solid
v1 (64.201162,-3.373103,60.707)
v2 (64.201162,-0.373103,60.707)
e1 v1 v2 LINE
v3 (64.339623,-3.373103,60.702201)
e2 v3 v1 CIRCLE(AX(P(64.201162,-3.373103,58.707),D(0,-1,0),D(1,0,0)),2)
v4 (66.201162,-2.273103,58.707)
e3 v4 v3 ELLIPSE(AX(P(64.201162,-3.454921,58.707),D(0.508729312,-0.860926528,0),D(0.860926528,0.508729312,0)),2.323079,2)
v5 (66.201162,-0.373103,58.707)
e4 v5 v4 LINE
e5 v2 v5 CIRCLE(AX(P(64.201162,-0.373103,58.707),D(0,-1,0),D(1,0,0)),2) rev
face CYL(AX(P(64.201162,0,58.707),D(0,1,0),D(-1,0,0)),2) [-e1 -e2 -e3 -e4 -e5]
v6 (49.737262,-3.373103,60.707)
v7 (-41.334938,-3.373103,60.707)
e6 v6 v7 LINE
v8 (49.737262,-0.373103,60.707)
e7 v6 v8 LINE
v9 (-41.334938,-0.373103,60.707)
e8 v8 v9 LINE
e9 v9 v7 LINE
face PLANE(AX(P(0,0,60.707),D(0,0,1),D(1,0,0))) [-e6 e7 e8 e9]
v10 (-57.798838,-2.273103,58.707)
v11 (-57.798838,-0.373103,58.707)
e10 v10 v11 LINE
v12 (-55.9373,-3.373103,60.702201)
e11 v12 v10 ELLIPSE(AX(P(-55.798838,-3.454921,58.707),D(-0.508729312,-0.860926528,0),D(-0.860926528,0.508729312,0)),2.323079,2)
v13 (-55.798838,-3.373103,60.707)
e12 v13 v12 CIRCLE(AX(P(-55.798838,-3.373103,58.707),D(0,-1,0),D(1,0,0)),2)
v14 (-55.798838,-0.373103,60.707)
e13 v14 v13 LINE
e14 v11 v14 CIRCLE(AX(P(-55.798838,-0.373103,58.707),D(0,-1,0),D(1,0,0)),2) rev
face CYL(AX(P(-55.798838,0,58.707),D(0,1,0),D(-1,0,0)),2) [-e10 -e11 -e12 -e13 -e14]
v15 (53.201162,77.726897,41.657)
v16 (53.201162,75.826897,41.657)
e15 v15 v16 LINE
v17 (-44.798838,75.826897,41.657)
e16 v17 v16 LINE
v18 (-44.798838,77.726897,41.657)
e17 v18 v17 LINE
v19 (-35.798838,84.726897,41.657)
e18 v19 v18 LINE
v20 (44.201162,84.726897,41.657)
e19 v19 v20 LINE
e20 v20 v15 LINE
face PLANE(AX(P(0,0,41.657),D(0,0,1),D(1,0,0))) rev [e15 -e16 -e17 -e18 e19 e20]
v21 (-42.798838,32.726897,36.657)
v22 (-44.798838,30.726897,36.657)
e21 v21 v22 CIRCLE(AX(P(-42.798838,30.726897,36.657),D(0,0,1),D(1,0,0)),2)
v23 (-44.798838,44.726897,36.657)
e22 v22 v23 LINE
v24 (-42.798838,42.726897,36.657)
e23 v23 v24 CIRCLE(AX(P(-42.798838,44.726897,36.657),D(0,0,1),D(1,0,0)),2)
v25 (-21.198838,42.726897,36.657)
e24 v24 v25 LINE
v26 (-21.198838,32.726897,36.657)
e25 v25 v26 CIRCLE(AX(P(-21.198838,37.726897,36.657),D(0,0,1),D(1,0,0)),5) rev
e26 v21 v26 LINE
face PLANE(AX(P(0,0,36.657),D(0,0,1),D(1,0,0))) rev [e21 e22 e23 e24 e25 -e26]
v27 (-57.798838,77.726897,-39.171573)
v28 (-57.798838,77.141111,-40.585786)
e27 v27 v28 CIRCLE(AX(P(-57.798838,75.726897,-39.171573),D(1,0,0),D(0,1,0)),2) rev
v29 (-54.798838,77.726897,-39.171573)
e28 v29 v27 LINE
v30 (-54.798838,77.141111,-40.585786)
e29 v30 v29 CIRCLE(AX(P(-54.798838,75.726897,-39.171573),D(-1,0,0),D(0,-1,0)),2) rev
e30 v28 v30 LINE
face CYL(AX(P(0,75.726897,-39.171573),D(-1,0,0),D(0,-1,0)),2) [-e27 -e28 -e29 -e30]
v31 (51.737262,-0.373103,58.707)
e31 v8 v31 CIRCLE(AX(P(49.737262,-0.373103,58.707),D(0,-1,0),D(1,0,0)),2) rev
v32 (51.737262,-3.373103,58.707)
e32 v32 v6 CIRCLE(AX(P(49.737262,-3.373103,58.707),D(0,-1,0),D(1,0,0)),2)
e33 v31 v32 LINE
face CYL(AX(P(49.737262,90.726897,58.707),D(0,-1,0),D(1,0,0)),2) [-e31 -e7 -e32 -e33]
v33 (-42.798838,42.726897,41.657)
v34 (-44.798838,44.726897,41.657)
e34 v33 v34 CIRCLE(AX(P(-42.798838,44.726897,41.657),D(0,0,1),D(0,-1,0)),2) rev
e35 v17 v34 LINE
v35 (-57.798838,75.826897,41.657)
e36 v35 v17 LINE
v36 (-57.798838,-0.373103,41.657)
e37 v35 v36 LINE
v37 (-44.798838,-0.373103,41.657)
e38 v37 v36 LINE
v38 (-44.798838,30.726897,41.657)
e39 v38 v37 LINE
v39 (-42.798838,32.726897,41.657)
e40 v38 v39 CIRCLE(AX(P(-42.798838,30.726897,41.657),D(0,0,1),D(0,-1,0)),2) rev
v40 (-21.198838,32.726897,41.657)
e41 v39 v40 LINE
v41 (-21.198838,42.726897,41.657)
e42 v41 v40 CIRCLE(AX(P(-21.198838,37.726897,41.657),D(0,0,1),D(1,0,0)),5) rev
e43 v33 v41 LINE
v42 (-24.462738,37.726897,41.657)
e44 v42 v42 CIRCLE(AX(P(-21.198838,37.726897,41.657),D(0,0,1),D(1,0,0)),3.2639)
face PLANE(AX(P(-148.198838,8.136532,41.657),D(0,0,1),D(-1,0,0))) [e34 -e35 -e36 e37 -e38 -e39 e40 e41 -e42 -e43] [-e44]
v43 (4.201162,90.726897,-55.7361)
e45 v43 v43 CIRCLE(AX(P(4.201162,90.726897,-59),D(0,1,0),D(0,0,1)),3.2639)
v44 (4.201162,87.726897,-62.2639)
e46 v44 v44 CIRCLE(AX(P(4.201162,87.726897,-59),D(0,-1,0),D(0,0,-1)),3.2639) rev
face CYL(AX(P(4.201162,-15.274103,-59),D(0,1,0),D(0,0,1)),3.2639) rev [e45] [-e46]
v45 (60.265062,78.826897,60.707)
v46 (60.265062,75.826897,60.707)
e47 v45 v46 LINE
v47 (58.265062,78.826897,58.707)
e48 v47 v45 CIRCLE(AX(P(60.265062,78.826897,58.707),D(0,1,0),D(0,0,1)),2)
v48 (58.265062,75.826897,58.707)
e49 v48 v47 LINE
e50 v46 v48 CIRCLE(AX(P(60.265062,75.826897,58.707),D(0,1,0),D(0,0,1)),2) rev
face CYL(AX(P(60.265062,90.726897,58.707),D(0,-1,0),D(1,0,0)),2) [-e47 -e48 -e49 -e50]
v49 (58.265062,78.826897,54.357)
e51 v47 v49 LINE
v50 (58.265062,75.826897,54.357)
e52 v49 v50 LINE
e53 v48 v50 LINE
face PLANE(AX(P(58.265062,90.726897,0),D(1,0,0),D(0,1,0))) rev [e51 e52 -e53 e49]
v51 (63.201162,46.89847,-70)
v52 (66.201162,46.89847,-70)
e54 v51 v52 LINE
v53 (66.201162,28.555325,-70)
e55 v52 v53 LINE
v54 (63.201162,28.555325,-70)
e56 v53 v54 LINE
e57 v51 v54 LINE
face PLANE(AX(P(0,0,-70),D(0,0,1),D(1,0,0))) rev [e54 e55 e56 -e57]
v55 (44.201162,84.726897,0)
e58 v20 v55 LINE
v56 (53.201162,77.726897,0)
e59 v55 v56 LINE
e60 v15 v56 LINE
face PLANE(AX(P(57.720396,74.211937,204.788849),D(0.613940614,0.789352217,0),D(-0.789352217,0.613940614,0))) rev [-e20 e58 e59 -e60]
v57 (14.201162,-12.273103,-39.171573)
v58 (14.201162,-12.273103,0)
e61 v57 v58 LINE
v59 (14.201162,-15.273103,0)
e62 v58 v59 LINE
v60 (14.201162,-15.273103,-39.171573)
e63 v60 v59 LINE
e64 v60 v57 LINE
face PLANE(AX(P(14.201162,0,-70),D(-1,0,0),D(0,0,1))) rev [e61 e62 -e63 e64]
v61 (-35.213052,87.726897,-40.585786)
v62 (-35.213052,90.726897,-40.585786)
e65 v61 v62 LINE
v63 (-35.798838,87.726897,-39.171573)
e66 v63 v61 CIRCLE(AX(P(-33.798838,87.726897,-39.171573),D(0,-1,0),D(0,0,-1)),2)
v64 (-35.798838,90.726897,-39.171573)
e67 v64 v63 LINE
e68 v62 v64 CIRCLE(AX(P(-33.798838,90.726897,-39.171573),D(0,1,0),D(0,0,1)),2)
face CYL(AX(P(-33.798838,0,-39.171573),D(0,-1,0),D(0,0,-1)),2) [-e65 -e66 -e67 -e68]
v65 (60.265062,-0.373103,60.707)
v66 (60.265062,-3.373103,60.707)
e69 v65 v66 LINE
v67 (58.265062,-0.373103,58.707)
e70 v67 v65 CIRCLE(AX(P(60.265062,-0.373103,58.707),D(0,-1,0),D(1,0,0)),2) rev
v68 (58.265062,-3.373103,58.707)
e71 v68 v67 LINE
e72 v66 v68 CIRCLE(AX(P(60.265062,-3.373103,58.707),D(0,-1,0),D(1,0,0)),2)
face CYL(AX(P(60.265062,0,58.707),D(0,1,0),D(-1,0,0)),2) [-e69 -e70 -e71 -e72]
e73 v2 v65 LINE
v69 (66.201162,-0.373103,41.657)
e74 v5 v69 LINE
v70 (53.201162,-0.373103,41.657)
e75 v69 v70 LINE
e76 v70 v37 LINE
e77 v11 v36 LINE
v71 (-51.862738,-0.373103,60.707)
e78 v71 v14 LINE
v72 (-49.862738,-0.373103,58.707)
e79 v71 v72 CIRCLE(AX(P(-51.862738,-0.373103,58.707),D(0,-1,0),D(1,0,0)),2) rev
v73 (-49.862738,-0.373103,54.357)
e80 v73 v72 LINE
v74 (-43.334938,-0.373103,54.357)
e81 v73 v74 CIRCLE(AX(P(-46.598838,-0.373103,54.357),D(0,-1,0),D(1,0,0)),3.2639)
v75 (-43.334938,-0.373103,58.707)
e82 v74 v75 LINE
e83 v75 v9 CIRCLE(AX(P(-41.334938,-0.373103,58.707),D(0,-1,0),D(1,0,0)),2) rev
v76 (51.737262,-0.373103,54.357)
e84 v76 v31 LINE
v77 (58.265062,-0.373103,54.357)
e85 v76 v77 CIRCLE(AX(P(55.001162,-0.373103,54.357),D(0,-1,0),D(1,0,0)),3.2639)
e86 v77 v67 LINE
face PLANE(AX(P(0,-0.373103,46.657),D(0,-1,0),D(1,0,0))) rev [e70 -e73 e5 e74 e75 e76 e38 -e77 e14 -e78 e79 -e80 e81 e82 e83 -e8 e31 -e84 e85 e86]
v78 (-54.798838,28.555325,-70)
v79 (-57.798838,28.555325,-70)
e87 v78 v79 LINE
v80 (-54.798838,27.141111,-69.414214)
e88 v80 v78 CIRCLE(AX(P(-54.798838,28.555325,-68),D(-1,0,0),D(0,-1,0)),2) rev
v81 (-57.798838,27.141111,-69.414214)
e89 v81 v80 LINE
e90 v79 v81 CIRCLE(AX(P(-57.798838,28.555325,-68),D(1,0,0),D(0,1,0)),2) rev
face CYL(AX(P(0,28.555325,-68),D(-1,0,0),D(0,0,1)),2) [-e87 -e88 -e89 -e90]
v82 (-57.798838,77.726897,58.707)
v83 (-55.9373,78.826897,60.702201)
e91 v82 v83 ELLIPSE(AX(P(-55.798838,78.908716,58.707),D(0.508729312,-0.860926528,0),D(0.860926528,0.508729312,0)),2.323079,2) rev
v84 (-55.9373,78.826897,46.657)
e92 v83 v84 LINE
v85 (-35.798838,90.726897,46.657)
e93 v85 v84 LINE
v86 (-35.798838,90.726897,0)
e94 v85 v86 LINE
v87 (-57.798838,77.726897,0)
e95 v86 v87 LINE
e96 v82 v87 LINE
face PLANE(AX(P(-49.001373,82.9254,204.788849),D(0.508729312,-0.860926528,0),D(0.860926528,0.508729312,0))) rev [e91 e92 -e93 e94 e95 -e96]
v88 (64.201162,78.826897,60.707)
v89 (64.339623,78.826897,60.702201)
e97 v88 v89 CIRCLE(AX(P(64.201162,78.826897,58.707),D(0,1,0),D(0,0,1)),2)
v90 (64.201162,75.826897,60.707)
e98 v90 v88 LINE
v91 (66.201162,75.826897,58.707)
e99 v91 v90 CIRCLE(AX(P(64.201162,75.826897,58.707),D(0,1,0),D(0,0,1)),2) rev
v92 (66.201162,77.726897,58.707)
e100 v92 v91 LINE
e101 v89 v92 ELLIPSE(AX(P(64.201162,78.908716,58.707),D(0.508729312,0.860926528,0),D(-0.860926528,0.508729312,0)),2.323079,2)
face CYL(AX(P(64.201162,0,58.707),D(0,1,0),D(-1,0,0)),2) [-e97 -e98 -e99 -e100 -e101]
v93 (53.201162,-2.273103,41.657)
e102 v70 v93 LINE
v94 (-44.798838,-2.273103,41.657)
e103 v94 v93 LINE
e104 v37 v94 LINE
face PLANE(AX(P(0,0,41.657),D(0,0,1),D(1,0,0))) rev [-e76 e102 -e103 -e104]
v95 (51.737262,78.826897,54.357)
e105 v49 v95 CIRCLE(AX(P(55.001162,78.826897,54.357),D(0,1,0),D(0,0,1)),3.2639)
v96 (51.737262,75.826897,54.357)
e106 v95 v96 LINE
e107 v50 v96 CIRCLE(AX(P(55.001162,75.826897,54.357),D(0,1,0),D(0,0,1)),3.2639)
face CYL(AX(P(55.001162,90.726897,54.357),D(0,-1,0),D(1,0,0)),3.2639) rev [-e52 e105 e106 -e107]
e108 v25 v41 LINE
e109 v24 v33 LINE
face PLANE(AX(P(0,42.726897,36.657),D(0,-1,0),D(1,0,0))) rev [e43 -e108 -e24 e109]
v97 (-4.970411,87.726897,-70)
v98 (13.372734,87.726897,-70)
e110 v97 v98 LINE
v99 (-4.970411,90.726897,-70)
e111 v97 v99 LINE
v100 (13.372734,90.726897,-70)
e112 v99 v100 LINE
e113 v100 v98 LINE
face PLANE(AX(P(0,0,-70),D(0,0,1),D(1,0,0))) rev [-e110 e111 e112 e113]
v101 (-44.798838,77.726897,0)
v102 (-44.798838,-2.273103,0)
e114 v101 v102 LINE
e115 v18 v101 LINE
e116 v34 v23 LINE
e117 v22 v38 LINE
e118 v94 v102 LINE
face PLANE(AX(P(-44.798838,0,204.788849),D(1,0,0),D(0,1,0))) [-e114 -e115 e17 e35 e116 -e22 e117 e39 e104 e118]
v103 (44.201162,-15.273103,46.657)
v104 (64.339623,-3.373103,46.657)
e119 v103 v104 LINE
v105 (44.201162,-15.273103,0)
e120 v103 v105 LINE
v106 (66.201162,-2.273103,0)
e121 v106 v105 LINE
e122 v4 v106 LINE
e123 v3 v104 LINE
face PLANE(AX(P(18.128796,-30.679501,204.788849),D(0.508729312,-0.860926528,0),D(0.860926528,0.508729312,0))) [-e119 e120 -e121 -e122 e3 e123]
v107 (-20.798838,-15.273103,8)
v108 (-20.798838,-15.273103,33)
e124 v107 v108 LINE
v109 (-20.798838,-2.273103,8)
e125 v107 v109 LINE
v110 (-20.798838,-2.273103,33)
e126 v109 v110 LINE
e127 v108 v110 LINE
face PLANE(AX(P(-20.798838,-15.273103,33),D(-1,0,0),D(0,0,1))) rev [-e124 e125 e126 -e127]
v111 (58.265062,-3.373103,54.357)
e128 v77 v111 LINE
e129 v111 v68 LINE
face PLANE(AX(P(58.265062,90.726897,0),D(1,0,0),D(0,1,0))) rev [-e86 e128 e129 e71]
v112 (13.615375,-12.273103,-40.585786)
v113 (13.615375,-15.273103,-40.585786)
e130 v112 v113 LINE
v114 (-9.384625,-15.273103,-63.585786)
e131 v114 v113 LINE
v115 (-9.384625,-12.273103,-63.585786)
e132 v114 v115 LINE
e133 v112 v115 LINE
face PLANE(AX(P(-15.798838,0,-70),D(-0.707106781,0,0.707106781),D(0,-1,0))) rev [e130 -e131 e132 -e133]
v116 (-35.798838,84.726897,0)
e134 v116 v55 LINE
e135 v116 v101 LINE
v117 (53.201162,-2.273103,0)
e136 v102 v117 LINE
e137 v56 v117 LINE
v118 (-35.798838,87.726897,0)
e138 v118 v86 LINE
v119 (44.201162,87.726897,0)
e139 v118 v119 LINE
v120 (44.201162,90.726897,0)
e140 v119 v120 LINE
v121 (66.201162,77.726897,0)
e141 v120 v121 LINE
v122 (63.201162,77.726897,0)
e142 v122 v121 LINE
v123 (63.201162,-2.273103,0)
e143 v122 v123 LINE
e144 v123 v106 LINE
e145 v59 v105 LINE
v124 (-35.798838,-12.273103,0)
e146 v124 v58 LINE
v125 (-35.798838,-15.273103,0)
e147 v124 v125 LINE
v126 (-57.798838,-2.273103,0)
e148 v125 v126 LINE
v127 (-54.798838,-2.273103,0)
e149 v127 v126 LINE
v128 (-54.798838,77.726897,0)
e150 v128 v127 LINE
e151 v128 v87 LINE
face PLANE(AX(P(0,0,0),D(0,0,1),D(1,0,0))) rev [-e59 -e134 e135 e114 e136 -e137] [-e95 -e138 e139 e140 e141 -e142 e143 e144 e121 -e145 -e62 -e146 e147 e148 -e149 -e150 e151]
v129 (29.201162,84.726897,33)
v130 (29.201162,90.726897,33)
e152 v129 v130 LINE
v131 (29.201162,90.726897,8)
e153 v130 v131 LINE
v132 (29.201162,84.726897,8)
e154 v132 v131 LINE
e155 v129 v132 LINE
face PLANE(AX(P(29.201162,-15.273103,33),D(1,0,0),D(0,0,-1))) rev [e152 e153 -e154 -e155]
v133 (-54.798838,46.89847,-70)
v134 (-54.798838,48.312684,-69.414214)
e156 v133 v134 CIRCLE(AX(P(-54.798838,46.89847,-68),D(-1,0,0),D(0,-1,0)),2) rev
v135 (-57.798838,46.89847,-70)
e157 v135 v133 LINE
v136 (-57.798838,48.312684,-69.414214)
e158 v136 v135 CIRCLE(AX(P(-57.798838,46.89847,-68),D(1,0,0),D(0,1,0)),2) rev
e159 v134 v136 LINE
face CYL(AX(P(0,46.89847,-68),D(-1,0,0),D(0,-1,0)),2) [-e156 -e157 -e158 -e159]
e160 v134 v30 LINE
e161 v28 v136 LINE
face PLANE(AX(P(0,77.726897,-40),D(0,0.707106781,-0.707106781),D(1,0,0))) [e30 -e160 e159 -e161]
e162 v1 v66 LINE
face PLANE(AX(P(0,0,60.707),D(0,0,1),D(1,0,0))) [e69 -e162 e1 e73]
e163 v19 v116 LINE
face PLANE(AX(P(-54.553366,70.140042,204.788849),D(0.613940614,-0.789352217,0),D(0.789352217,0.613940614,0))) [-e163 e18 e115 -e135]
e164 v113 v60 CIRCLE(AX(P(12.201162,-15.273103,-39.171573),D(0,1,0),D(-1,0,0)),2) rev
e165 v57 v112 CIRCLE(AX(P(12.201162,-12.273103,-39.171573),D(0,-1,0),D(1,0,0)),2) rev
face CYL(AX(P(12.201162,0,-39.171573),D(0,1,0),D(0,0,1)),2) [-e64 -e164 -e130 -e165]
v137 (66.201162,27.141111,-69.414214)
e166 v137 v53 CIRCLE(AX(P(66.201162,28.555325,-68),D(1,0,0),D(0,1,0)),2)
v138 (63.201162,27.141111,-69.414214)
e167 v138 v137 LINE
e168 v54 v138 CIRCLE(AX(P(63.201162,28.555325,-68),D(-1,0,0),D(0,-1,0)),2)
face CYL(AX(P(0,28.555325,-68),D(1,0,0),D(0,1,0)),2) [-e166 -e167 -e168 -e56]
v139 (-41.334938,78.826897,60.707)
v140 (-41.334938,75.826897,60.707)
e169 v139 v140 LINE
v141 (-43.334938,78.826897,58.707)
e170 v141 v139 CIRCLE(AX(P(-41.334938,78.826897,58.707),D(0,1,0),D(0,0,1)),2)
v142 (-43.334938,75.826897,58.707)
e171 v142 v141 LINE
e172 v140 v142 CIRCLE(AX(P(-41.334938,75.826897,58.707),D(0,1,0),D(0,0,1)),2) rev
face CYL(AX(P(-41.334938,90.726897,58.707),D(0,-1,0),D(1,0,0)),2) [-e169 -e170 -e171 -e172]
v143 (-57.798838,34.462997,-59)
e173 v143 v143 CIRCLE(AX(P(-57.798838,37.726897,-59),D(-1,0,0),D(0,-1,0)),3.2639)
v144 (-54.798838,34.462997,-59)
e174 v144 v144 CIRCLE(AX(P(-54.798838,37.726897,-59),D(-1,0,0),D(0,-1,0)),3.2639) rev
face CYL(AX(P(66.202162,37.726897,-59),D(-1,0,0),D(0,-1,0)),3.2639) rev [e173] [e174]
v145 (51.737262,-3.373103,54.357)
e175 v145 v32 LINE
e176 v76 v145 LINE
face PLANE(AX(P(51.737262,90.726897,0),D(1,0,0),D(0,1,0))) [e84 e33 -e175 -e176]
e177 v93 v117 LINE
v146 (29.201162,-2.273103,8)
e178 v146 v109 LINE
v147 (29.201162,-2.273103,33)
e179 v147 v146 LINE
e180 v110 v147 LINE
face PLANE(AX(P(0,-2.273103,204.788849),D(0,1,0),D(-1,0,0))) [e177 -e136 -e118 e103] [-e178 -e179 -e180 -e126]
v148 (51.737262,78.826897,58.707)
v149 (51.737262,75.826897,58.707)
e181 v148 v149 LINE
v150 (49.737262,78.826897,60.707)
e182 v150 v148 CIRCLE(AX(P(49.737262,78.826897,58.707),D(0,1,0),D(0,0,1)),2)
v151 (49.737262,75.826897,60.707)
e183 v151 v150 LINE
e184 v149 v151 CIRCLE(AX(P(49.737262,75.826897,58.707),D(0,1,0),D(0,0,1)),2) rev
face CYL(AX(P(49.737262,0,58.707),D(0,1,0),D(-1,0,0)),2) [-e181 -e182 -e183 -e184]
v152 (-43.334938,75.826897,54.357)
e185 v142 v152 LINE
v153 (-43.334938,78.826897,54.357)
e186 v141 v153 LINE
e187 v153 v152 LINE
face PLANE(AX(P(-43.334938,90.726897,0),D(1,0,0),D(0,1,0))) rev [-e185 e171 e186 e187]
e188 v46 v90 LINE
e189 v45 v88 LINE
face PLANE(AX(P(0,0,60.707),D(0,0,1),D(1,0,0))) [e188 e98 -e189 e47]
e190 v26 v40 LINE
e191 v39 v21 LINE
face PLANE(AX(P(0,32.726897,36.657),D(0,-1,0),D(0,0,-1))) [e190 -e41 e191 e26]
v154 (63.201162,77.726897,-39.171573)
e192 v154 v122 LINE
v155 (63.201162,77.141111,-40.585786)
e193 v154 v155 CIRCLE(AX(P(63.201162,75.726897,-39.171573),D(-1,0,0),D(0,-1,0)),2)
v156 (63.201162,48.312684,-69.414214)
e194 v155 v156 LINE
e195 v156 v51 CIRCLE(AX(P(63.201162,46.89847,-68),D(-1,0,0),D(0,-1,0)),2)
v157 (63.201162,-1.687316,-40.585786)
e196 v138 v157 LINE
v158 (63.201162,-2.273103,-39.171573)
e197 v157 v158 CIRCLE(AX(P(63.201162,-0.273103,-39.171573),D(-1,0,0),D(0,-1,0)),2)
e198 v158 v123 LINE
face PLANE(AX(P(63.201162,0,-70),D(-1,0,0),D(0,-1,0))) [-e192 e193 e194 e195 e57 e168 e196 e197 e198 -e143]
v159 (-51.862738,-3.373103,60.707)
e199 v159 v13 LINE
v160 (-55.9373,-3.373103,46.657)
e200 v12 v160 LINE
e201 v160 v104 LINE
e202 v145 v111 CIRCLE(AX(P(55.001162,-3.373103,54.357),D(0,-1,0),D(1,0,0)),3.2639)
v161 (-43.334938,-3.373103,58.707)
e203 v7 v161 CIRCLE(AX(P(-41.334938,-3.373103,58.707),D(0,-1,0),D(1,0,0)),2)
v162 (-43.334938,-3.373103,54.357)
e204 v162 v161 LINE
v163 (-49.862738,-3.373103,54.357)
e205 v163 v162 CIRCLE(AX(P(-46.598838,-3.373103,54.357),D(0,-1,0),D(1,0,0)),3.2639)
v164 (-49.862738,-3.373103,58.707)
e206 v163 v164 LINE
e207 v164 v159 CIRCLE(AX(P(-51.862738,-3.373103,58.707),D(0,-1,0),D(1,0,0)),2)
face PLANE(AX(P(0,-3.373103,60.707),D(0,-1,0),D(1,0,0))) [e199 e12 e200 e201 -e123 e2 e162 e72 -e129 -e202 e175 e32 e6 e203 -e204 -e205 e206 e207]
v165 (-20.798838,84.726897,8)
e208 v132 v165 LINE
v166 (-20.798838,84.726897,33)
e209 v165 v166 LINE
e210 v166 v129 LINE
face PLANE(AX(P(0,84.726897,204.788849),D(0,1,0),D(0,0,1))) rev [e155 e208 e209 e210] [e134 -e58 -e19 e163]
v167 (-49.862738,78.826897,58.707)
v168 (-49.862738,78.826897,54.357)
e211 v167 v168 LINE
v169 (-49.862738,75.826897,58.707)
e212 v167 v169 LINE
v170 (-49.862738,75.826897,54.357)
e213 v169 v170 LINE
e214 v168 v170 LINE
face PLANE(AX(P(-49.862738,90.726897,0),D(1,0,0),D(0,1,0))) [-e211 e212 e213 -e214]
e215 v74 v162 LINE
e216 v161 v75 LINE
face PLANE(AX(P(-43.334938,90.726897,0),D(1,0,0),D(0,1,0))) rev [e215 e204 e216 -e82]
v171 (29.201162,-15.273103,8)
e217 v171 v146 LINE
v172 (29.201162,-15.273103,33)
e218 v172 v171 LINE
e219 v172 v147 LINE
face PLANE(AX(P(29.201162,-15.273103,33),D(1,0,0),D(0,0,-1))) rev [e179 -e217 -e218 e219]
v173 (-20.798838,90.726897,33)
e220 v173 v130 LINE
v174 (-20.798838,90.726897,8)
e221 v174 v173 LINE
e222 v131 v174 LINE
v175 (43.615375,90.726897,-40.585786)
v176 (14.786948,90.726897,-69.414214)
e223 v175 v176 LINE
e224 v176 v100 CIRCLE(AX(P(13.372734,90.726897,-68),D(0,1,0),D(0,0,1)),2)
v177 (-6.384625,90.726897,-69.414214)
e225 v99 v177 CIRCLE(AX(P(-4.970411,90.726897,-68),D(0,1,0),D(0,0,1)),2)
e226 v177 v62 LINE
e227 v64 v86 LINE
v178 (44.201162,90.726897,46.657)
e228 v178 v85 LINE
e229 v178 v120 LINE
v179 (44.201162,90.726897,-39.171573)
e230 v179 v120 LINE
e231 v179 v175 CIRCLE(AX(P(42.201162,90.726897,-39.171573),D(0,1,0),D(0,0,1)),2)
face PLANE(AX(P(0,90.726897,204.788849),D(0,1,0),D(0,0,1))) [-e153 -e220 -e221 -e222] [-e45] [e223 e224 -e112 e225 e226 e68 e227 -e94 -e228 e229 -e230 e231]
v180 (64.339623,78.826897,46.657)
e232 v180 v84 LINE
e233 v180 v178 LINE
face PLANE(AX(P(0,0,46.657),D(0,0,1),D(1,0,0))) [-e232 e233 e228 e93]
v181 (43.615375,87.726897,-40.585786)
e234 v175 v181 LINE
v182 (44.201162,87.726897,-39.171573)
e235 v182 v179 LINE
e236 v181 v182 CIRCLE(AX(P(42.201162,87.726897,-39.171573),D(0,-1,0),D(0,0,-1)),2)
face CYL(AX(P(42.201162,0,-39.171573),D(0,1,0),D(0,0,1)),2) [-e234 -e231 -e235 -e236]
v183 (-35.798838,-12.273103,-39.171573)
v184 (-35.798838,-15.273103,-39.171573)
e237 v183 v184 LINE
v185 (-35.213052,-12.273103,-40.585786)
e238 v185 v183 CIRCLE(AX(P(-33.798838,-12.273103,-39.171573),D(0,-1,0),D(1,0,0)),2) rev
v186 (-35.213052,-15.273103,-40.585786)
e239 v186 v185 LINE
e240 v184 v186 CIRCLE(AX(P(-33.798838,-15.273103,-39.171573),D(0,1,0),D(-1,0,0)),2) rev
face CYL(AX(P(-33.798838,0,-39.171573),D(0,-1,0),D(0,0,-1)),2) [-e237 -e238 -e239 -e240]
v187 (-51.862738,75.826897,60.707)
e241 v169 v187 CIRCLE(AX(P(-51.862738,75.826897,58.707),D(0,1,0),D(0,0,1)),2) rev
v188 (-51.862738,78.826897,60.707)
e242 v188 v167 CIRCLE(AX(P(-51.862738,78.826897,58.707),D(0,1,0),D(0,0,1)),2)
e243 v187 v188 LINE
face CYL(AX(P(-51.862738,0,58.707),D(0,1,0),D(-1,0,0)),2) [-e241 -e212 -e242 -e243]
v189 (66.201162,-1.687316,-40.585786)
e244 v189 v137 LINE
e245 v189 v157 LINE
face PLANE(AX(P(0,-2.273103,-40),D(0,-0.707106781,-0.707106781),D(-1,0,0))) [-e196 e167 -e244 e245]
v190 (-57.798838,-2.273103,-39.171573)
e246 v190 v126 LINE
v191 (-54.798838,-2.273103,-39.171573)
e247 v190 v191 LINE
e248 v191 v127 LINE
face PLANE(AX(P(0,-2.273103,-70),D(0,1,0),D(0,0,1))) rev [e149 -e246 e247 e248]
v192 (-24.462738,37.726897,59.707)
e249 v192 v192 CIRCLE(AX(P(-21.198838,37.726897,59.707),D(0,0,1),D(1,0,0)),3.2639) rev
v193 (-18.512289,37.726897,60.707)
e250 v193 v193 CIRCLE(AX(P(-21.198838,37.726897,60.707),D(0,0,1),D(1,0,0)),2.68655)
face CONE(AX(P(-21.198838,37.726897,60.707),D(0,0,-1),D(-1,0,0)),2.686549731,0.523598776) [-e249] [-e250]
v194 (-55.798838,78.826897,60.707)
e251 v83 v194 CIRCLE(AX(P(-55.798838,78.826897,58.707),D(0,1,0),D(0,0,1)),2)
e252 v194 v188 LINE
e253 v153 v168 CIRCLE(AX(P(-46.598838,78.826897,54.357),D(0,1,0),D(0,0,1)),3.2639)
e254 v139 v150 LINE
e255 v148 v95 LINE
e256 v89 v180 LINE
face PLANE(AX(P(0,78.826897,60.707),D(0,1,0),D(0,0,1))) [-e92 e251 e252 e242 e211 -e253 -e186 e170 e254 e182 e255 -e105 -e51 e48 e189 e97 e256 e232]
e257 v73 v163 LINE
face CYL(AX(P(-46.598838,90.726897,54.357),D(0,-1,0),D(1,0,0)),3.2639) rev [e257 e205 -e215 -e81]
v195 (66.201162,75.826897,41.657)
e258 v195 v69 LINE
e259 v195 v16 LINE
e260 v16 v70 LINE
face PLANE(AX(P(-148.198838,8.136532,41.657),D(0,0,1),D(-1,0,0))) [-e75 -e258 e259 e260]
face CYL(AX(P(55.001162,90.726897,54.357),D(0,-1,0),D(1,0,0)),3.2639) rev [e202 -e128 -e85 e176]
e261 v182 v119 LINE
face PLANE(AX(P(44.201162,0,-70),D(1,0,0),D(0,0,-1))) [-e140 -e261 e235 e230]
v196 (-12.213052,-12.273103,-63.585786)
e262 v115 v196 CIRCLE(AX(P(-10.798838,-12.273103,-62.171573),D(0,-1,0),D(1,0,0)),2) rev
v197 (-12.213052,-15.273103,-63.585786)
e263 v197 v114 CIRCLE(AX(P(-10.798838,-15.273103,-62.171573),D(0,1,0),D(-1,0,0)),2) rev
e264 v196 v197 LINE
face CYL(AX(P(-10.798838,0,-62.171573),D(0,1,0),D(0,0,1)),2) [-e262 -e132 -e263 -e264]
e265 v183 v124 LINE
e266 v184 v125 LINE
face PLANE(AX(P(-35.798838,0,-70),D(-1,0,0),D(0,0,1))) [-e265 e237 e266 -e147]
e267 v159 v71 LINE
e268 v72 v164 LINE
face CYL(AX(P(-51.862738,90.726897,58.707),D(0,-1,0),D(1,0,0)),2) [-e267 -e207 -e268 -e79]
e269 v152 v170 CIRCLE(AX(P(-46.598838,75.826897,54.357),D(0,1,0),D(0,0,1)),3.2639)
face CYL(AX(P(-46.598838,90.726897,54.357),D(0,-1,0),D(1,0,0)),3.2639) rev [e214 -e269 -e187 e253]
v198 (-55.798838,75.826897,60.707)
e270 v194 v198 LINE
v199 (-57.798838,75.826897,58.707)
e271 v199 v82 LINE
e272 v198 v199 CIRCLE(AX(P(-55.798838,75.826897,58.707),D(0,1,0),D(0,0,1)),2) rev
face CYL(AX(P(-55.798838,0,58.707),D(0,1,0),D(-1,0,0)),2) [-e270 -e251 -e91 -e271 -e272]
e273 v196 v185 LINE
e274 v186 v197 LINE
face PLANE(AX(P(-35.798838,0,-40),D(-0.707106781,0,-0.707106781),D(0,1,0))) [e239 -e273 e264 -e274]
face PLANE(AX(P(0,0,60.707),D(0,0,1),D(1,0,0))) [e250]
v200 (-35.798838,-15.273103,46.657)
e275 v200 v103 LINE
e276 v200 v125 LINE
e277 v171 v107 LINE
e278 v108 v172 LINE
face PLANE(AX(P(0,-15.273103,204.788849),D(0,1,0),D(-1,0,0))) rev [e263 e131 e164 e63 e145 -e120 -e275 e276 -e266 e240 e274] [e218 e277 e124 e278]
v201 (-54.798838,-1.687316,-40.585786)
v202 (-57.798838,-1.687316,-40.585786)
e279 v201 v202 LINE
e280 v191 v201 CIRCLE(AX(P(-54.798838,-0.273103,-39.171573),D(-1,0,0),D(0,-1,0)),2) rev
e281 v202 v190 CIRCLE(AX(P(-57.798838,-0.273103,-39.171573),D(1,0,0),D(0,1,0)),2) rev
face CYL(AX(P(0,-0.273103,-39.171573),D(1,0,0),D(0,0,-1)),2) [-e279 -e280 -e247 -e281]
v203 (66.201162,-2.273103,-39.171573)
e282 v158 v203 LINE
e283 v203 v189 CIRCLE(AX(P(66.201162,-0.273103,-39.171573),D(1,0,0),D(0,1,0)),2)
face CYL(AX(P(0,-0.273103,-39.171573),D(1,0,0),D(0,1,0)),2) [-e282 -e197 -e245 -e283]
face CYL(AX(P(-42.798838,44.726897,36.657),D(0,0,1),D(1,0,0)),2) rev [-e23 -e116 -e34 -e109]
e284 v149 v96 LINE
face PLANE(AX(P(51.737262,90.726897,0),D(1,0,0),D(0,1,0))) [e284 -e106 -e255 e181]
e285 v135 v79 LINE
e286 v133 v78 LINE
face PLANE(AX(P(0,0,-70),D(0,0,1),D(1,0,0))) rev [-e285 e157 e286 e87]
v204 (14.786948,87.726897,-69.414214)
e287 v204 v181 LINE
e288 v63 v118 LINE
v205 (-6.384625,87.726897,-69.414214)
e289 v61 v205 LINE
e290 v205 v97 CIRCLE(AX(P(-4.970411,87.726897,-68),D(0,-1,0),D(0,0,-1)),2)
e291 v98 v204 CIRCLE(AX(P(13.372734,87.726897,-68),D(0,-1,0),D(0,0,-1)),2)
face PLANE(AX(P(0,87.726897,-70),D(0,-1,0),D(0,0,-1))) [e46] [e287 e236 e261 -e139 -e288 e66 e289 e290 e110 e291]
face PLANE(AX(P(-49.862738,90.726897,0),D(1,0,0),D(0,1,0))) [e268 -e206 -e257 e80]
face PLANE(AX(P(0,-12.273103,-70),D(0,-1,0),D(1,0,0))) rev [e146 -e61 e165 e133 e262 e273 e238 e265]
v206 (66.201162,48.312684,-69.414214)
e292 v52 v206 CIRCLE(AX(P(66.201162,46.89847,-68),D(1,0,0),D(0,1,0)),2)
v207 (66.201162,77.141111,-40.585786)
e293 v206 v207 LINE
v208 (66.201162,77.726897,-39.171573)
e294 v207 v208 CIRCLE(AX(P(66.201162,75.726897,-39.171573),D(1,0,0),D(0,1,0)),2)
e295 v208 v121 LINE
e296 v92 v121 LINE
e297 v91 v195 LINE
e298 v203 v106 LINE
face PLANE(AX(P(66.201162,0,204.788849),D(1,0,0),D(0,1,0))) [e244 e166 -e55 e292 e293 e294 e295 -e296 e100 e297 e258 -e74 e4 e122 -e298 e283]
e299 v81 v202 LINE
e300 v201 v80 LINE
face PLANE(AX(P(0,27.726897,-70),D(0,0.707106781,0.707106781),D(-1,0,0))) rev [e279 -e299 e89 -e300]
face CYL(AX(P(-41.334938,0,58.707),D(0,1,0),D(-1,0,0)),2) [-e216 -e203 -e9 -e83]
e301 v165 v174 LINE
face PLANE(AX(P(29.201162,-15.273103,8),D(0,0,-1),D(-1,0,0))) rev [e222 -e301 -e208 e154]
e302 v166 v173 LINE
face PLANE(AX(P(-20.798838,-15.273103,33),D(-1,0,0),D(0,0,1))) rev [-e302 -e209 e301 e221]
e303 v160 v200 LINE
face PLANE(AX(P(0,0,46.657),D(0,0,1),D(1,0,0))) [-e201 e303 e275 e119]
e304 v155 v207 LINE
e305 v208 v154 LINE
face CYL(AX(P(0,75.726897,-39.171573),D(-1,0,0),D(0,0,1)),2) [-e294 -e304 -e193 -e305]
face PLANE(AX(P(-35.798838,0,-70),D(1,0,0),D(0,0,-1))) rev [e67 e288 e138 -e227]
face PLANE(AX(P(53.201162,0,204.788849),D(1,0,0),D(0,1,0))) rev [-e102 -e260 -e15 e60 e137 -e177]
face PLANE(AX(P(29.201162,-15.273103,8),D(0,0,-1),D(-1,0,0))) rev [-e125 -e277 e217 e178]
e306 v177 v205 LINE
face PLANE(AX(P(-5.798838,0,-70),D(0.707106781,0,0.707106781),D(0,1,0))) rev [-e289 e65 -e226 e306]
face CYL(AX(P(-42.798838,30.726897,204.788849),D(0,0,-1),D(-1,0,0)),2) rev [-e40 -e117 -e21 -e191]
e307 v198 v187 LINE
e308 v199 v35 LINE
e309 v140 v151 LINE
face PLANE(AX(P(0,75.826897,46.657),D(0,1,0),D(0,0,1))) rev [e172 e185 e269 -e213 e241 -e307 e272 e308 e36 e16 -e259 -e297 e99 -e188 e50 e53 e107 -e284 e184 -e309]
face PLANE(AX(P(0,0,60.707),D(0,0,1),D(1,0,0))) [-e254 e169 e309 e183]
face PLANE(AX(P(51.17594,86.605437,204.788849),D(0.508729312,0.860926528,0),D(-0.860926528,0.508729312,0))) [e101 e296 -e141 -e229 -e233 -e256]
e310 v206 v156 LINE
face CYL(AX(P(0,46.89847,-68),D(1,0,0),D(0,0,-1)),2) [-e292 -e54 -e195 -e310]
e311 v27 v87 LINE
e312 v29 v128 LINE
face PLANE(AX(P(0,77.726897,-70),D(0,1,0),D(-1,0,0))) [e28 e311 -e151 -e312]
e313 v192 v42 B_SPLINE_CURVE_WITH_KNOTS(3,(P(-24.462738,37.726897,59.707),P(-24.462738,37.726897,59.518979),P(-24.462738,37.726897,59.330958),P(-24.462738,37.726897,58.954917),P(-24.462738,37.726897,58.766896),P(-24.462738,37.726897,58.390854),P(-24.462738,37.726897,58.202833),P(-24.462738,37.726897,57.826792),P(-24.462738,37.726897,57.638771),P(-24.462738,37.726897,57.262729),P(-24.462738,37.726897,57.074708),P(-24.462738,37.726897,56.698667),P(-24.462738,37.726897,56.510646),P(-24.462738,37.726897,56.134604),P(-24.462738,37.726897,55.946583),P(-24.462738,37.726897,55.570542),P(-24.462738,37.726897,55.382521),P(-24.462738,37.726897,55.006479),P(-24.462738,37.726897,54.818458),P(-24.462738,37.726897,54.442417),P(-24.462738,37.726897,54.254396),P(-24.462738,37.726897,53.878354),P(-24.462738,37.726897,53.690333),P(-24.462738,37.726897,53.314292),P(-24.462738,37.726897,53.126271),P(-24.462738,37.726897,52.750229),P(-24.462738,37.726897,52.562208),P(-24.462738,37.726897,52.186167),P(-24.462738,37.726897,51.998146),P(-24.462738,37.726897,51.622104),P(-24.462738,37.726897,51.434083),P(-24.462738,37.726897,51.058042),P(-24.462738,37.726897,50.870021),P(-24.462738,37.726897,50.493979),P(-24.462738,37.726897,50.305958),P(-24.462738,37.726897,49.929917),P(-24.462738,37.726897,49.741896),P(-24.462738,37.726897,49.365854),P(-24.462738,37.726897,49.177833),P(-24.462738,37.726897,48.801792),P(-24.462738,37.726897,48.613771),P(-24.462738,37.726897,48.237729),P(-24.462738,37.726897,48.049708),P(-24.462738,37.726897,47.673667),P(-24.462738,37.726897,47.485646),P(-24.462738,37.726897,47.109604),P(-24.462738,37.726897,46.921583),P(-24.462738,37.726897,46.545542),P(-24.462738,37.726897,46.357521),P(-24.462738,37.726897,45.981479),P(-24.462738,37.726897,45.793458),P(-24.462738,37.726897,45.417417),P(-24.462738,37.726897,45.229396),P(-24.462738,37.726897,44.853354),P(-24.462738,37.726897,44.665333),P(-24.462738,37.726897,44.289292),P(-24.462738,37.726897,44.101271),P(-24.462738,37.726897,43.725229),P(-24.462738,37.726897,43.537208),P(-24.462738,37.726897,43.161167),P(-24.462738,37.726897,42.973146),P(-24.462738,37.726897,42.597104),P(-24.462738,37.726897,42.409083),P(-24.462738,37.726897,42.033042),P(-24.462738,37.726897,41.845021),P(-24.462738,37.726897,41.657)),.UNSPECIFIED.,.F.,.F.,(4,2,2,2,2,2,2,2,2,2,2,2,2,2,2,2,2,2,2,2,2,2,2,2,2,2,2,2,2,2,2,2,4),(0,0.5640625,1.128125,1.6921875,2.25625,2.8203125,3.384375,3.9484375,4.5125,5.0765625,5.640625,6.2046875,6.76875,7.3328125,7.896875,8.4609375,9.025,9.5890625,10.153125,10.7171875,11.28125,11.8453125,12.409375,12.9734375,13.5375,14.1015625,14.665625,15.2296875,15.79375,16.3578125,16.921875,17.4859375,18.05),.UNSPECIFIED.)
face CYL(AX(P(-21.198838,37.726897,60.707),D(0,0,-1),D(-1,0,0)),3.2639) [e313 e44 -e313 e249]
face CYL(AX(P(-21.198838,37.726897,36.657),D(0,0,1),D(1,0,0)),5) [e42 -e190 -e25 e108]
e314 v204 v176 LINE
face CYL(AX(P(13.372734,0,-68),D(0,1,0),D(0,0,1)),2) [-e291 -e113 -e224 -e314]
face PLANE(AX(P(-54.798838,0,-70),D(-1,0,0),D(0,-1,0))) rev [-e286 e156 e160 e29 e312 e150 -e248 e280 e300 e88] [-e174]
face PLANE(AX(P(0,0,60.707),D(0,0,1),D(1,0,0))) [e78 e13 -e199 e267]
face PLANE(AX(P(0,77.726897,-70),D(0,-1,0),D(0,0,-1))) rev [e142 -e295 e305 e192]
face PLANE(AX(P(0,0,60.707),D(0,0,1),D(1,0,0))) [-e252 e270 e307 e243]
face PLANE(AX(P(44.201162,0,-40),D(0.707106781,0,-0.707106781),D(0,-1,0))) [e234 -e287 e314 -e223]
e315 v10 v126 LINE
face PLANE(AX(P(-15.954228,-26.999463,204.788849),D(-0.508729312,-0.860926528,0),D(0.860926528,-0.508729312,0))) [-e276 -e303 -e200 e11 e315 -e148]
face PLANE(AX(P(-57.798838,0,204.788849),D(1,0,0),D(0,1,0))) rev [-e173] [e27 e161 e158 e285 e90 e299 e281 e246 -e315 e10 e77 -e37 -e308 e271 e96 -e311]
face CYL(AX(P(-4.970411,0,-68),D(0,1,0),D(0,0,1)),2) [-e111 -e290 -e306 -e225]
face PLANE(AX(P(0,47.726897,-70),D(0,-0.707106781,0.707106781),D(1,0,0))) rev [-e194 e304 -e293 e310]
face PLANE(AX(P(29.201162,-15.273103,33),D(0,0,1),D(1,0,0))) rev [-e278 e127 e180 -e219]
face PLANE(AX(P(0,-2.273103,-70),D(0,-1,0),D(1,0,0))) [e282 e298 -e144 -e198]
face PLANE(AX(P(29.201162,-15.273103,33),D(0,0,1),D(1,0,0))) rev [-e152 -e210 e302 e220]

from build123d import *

# Parameters (mm, degrees)
SKETCH1_W           = 10
SKETCH1_H           = 80
SKETCH1_W_2         = 3
SKETCH1_W_3         = 80
SKETCH1_H_2         = 3
SKETCH1_H_3         = 10
SKETCH1_W_4         = 30
BOSS_EXTRUDE1_DEPTH = 41.657
SKETCH1_6_W         = 3
SKETCH1_6_H         = 80
SKETCH1_6_W_2       = 80
SKETCH1_6_H_2       = 3
SKETCH1_6_W_3       = 50
BOSS_EXTRUDE2_DEPTH = 70
CUT_EXTRUDE1_REACH  = 170.841
SKETCH2_R           = 3.2639
CUT_EXTRUDE2_REACH  = 145.243
SKETCH3_R           = 3.2639
SKETCH4_W           = 98
SKETCH4_H           = 1.9
BOSS_EXTRUDE3_DEPTH = 5
SKETCH4_4_W         = 98
SKETCH4_4_H         = 1.9
BOSS_EXTRUDE4_DEPTH = 19.05
CUT_EXTRUDE3_DEPTH  = 135.675178822
SKETCH6_R           = 3.2639
BOSS_EXTRUDE5_DEPTH = 5
SKETCH6_3_R         = 3.2639
BOSS_EXTRUDE6_DEPTH = 19.05
SKETCH7_W           = 50
SKETCH7_H           = 25
CUT_EXTRUDE4_DEPTH  = 144.24312825
CHAMFER1_SIZE       = 30
CHAMFER2_SIZE       = 1
CHAMFER2_SIZE2      = 0.577350269
FILLET1_R           = 2


with BuildPart() as part:
    # Sketch1 → Boss-Extrude1 (new body)
    with BuildSketch(Plane.XY):
        with Locations((-49.798838448, 37.726897406)):
            Rectangle(SKETCH1_W, SKETCH1_H)
        with Locations((-56.298838448, 37.726897406)):
            Rectangle(SKETCH1_W_2, SKETCH1_H)
        Polygon((-35.798838448, 87.726897406), (-35.798838448, 84.726897406), (-44.798838448, 77.726897406), (-54.798838448, 77.726897406), (-57.798838448, 77.726897406), (-35.798838448, 90.726897406), align=None)
        with Locations((4.201161552, 86.226897406)):
            Rectangle(SKETCH1_W_3, SKETCH1_H_2)
        with Locations((4.201161552, 89.226897406)):
            Rectangle(SKETCH1_W_3, SKETCH1_H_2)
        Polygon((44.201161552, 87.726897406), (44.201161552, 90.726897406), (66.201161552, 77.726897406), (63.201161552, 77.726897406), (53.201161552, 77.726897406), (44.201161552, 84.726897406), align=None)
        with Locations((58.201161552, 37.726897406)):
            Rectangle(SKETCH1_W, SKETCH1_H)
        with Locations((64.701161552, 37.726897406)):
            Rectangle(SKETCH1_W_2, SKETCH1_H)
        with Locations((4.201161552, -7.273102594)):
            Rectangle(SKETCH1_W_3, SKETCH1_H_3)
        Polygon((66.201161552, -2.273102594), (44.201161552, -15.273102594), (44.201161552, -12.273102594), (44.201161552, -2.273102594), (53.201161552, -2.273102594), (63.201161552, -2.273102594), align=None)
        Polygon((-35.798838448, -15.273102594), (-57.798838448, -2.273102594), (-54.798838448, -2.273102594), (-44.798838448, -2.273102594), (-35.798838448, -2.273102594), (-35.798838448, -12.273102594), align=None)
        with Locations((4.201161552, -13.773102594)):
            Rectangle(SKETCH1_W_3, SKETCH1_H_2)
        with Locations((29.201161552, -13.773102594)):
            Rectangle(SKETCH1_W_4, SKETCH1_H_2)
    extrude(amount=BOSS_EXTRUDE1_DEPTH)

    # Sketch1<6> → Boss-Extrude2 (add)
    with BuildSketch(Plane.XY):
        with Locations((-56.298838448, 37.726897406)):
            Rectangle(SKETCH1_6_W, SKETCH1_6_H)
        with Locations((4.201161552, 89.226897406)):
            Rectangle(SKETCH1_6_W_2, SKETCH1_6_H_2)
        with Locations((-10.798838448, -13.773102594)):
            Rectangle(SKETCH1_6_W_3, SKETCH1_6_H_2)
        with Locations((64.701161552, 37.726897406)):
            Rectangle(SKETCH1_6_W, SKETCH1_6_H)
    extrude(amount=-BOSS_EXTRUDE2_DEPTH)

    # Sketch2 → Cut-Extrude1 (cut, up to next)
    with BuildSketch(Plane.ZY.offset(57.798838448), mode=Mode.PRIVATE) as cut_extrude1_sk1:
        with Locations(Location((-59, 37.726897406, 0), (0, 0, 270))):
            Circle(SKETCH2_R)
    cut_extrude1_tool1 = extrude(cut_extrude1_sk1.sketch, amount=-CUT_EXTRUDE1_REACH, mode=Mode.PRIVATE) & part.part
    add(cut_extrude1_tool1.solids().sort_by_distance((-57.798838, 37.726897, -59))[0], mode=Mode.SUBTRACT)

    # Sketch3 → Cut-Extrude2 (cut, up to next)
    with BuildSketch(Plane(origin=(0, 90.726897406, 0), x_dir=(1, 0, 0), z_dir=(0, 1, 0)), mode=Mode.PRIVATE) as cut_extrude2_sk1:
        with Locations(Location((4.201161552, 59, 0), (0, 0, 270))):
            Circle(SKETCH3_R)
    cut_extrude2_tool1 = extrude(cut_extrude2_sk1.sketch, amount=-CUT_EXTRUDE2_REACH, mode=Mode.PRIVATE) & part.part
    add(cut_extrude2_tool1.solids().sort_by_distance((4.201162, 90.726897, -59))[0], mode=Mode.SUBTRACT)

    # Sketch4 → Boss-Extrude3 (add)
    with BuildSketch(Plane.XY.offset(41.657)):
        Polygon((51.786875838, 78.826897406), (64.33962309, 78.826897406), (44.201161552, 90.726897406), (-35.798838448, 90.726897406), (-55.937299987, 78.826897406), (-43.384552734, 78.826897406), (-35.798838448, 84.726897406), (44.201161552, 84.726897406), align=None)
        Polygon((-43.384552734, 78.826897406), (51.786875838, 78.826897406), (44.201161552, 84.726897406), (-35.798838448, 84.726897406), align=None)
        Polygon((53.201161552, 75.826897406), (66.201161552, 75.826897406), (66.201161552, 77.726897406), (64.33962309, 78.826897406), (51.786875838, 78.826897406), (53.201161552, 77.726897406), align=None)
        Polygon((-44.798838448, 75.826897406), (53.201161552, 75.826897406), (53.201161552, 77.726897406), (51.786875838, 78.826897406), (-43.384552734, 78.826897406), (-44.798838448, 77.726897406), align=None)
        Polygon((66.201161552, -2.273102594), (66.201161552, -0.373102594), (53.201161552, -0.373102594), (53.201161552, -2.273102594), (-44.798838448, -2.273102594), (-44.798838448, -0.373102594), (-57.798838448, -0.373102594), (-57.798838448, -2.273102594), (-55.937299987, -3.373102594), (64.33962309, -3.373102594), align=None)
        with Locations((4.201161552, -1.323102594)):
            Rectangle(SKETCH4_W, SKETCH4_H)
        Polygon((44.201161552, -15.273102594), (64.33962309, -3.373102594), (-55.937299987, -3.373102594), (-35.798838448, -15.273102594), align=None)
        Polygon((-57.798838448, 75.826897406), (-44.798838448, 75.826897406), (-44.798838448, 77.726897406), (-43.384552734, 78.826897406), (-55.937299987, 78.826897406), (-57.798838448, 77.726897406), align=None)
    extrude(amount=BOSS_EXTRUDE3_DEPTH)

    # Sketch4<4> → Boss-Extrude4 (add)
    with BuildSketch(Plane.XY.offset(41.657)):
        Polygon((53.201161552, 75.826897406), (66.201161552, 75.826897406), (66.201161552, 77.726897406), (64.33962309, 78.826897406), (51.786875838, 78.826897406), (53.201161552, 77.726897406), align=None)
        Polygon((-44.798838448, 75.826897406), (53.201161552, 75.826897406), (53.201161552, 77.726897406), (51.786875838, 78.826897406), (-43.384552734, 78.826897406), (-44.798838448, 77.726897406), align=None)
        Polygon((66.201161552, -2.273102594), (66.201161552, -0.373102594), (53.201161552, -0.373102594), (53.201161552, -2.273102594), (-44.798838448, -2.273102594), (-44.798838448, -0.373102594), (-57.798838448, -0.373102594), (-57.798838448, -2.273102594), (-55.937299987, -3.373102594), (64.33962309, -3.373102594), align=None)
        with Locations((4.201161552, -1.323102594)):
            Rectangle(SKETCH4_4_W, SKETCH4_4_H)
        Polygon((-57.798838448, 75.826897406), (-44.798838448, 75.826897406), (-44.798838448, 77.726897406), (-43.384552734, 78.826897406), (-55.937299987, 78.826897406), (-57.798838448, 77.726897406), align=None)
    extrude(amount=BOSS_EXTRUDE4_DEPTH)

    # Sketch5 → Cut-Extrude3 (cut, through all)
    with BuildSketch(Plane.XZ.offset(3.373102594)):
        with BuildLine():
            Line((-49.862738448, 60.707), (-49.862738448, 54.357))
            ThreePointArc((-49.862738448, 54.357), (-46.598838448, 51.0931), (-43.334938448, 54.357))
            Line((-43.334938448, 54.357), (-43.334938448, 60.707))
            Line((-43.334938448, 60.707), (-49.862738448, 60.707))
        make_face()
        with BuildLine():
            Line((51.737261552, 60.707), (51.737261552, 54.357))
            ThreePointArc((51.737261552, 54.357), (55.001161552, 51.0931), (58.265061552, 54.357))
            Line((58.265061552, 54.357), (58.265061552, 60.707))
            Line((58.265061552, 60.707), (51.737261552, 60.707))
        make_face()
    extrude(amount=-CUT_EXTRUDE3_DEPTH, mode=Mode.SUBTRACT)

    # Sketch6 → Boss-Extrude5 (add)
    # profile 1 of 2: a face of its own
    with BuildSketch(Plane.XY.offset(41.657)):
        with BuildLine():
            Line((-44.798838448, 42.726897406), (-44.798838448, 37.726897406))
            Line((-44.798838448, 37.726897406), (-44.798838448, 32.726897406))
            Line((-44.798838448, 32.726897406), (-21.198838448, 32.726897406))
            ThreePointArc((-21.198838448, 32.726897406), (-16.198838448, 37.726897406), (-21.198838448, 42.726897406))
            Line((-21.198838448, 42.726897406), (-44.798838448, 42.726897406))
        make_face()
        with Locations((-21.198838448, 37.726897406)):
            Circle(SKETCH6_R, mode=Mode.SUBTRACT)
    # profile 2 of 2: a face of its own
    with BuildSketch(Plane.XY.offset(41.657)):
        with Locations((-21.198838448, 37.726897406)):
            Circle(SKETCH6_R)
    extrude(amount=-BOSS_EXTRUDE5_DEPTH)

    # Sketch6<3> → Boss-Extrude6 (add)
    with BuildSketch(Plane.XY.offset(41.657)):
        with Locations(Location((-21.198838448, 37.726897406, 0), (0, 0, 180))):
            Circle(SKETCH6_3_R)
    extrude(amount=BOSS_EXTRUDE6_DEPTH)

    # Sketch7 → Cut-Extrude4 (cut, through all)
    with BuildSketch(Plane(origin=(0, 90.726897406, 0), x_dir=(1, 0, 0), z_dir=(0, 1, 0))):
        with Locations((4.201161552, -20.5)):
            Rectangle(SKETCH7_W, SKETCH7_H)
    extrude(amount=-CUT_EXTRUDE4_DEPTH, mode=Mode.SUBTRACT)

    # Chamfer1
    # the kernel refuses this chamfer: 30 mm, written as the material it takes off along each edge
    with BuildSketch(Plane(origin=(22.351651191, 77.726897406, -70), x_dir=(0, 0.02749587661058632, 0.9996219169112968), z_dir=(-1, 0, 0)), Plane(origin=(-134.949328087, -2.273102594, -70), x_dir=(0, -0.02749587661058638, 0.9996219169112968), z_dir=(1, 0, 0)), Plane(origin=(-35.798838448, 64.877387045, -70), x_dir=(-0.02749587661058632, 0, 0.9996219169112968), z_dir=(0, -1, 0)), Plane(origin=(14.201161552, -92.423592233, -70), x_dir=(0.02749587661058638, 0, 0.9996219169112968), z_dir=(0, 1, 0)), Plane(origin=(-13.949328087, -2.273102594, -70), x_dir=(0, -0.02749587661058636, 0.9996219169112968), z_dir=(1, 0, 0)), Plane(origin=(143.351651191, 77.726897406, -70), x_dir=(0, 0.02749587661058632, 0.9996219169112968), z_dir=(-1, 0, 0)), Plane(origin=(44.201161552, 10.576407767, -70), x_dir=(0.02749587661058632, 0, 0.9996219169112968), z_dir=(0, 1, 0)), Plane(origin=(-35.798838448, 167.877387045, -70), x_dir=(-0.02749587661058632, 0, 0.9996219169112968), z_dir=(0, -1, 0))) as chamfer1_piece_1:
        Polygon((CHAMFER1_SIZE * 0.999621916911, -CHAMFER1_SIZE * 0.0274958766106), (-CHAMFER1_SIZE * 0.0274958766106, -CHAMFER1_SIZE * 0.999621916911), (0, 0), align=None)
    extrude(amount=157.300979278, mode=Mode.SUBTRACT)

    # Chamfer2
    chamfer2_edges = [part.edges().sort_by_distance(p)[0] for p in [
        (-17.934938448, 37.726897406, 60.707),
    ]]
    chamfer2_side = [part.faces().sort_by_distance(p)[0] for p in [
        (-17.934938448, 37.726897406, 51.182),
    ]]
    chamfer(chamfer2_edges, length=CHAMFER2_SIZE, length2=CHAMFER2_SIZE2, reference=chamfer2_side[0])

    # Fillet1
    fillet1_edges = [part.edges().sort_by_distance(p)[0] for p in [
        (66.201161552, -1.323102594, 60.707),
        (-57.798838448, -1.323102594, 60.707),
        (-57.798838448, 76.776897406, 60.707),
        (66.201161552, 76.776897406, 60.707),
        (58.265061552, 77.326897406, 60.707),
        (51.737261552, 77.326897406, 60.707),
        (-43.334938448, 77.326897406, 60.707),
        (-49.862738448, 77.326897406, 60.707),
        (-49.862738448, -1.873102594, 60.707),
        (-43.334938448, -1.873102594, 60.707),
        (51.737261552, -1.873102594, 60.707),
        (58.265061552, -1.873102594, 60.707),
        (-44.798838448, 32.726897406, 39.157),
        (-44.798838448, 42.726897406, 39.157),
        (14.201161552, 89.226897406, -70),
        (-5.798838448, 89.226897406, -70),
        (-35.798838448, 89.226897406, -40),
        (-56.298838448, 77.726897406, -40),
        (-56.298838448, 27.726897406, -70),
        (-56.298838448, 47.726897406, -70),
        (-56.298838448, -2.273102594, -40),
        (-35.798838448, -13.773102594, -40),
        (14.201161552, -13.773102594, -40),
        (64.701161552, -2.273102594, -40),
        (64.701161552, 47.726897406, -70),
        (64.701161552, 27.726897406, -70),
        (64.701161552, 77.726897406, -40),
        (44.201161552, 89.226897406, -40),
        (-10.798838448, -13.773102594, -65),
    ]]
    fillet(fillet1_edges, radius=FILLET1_R)


solid = part.part
